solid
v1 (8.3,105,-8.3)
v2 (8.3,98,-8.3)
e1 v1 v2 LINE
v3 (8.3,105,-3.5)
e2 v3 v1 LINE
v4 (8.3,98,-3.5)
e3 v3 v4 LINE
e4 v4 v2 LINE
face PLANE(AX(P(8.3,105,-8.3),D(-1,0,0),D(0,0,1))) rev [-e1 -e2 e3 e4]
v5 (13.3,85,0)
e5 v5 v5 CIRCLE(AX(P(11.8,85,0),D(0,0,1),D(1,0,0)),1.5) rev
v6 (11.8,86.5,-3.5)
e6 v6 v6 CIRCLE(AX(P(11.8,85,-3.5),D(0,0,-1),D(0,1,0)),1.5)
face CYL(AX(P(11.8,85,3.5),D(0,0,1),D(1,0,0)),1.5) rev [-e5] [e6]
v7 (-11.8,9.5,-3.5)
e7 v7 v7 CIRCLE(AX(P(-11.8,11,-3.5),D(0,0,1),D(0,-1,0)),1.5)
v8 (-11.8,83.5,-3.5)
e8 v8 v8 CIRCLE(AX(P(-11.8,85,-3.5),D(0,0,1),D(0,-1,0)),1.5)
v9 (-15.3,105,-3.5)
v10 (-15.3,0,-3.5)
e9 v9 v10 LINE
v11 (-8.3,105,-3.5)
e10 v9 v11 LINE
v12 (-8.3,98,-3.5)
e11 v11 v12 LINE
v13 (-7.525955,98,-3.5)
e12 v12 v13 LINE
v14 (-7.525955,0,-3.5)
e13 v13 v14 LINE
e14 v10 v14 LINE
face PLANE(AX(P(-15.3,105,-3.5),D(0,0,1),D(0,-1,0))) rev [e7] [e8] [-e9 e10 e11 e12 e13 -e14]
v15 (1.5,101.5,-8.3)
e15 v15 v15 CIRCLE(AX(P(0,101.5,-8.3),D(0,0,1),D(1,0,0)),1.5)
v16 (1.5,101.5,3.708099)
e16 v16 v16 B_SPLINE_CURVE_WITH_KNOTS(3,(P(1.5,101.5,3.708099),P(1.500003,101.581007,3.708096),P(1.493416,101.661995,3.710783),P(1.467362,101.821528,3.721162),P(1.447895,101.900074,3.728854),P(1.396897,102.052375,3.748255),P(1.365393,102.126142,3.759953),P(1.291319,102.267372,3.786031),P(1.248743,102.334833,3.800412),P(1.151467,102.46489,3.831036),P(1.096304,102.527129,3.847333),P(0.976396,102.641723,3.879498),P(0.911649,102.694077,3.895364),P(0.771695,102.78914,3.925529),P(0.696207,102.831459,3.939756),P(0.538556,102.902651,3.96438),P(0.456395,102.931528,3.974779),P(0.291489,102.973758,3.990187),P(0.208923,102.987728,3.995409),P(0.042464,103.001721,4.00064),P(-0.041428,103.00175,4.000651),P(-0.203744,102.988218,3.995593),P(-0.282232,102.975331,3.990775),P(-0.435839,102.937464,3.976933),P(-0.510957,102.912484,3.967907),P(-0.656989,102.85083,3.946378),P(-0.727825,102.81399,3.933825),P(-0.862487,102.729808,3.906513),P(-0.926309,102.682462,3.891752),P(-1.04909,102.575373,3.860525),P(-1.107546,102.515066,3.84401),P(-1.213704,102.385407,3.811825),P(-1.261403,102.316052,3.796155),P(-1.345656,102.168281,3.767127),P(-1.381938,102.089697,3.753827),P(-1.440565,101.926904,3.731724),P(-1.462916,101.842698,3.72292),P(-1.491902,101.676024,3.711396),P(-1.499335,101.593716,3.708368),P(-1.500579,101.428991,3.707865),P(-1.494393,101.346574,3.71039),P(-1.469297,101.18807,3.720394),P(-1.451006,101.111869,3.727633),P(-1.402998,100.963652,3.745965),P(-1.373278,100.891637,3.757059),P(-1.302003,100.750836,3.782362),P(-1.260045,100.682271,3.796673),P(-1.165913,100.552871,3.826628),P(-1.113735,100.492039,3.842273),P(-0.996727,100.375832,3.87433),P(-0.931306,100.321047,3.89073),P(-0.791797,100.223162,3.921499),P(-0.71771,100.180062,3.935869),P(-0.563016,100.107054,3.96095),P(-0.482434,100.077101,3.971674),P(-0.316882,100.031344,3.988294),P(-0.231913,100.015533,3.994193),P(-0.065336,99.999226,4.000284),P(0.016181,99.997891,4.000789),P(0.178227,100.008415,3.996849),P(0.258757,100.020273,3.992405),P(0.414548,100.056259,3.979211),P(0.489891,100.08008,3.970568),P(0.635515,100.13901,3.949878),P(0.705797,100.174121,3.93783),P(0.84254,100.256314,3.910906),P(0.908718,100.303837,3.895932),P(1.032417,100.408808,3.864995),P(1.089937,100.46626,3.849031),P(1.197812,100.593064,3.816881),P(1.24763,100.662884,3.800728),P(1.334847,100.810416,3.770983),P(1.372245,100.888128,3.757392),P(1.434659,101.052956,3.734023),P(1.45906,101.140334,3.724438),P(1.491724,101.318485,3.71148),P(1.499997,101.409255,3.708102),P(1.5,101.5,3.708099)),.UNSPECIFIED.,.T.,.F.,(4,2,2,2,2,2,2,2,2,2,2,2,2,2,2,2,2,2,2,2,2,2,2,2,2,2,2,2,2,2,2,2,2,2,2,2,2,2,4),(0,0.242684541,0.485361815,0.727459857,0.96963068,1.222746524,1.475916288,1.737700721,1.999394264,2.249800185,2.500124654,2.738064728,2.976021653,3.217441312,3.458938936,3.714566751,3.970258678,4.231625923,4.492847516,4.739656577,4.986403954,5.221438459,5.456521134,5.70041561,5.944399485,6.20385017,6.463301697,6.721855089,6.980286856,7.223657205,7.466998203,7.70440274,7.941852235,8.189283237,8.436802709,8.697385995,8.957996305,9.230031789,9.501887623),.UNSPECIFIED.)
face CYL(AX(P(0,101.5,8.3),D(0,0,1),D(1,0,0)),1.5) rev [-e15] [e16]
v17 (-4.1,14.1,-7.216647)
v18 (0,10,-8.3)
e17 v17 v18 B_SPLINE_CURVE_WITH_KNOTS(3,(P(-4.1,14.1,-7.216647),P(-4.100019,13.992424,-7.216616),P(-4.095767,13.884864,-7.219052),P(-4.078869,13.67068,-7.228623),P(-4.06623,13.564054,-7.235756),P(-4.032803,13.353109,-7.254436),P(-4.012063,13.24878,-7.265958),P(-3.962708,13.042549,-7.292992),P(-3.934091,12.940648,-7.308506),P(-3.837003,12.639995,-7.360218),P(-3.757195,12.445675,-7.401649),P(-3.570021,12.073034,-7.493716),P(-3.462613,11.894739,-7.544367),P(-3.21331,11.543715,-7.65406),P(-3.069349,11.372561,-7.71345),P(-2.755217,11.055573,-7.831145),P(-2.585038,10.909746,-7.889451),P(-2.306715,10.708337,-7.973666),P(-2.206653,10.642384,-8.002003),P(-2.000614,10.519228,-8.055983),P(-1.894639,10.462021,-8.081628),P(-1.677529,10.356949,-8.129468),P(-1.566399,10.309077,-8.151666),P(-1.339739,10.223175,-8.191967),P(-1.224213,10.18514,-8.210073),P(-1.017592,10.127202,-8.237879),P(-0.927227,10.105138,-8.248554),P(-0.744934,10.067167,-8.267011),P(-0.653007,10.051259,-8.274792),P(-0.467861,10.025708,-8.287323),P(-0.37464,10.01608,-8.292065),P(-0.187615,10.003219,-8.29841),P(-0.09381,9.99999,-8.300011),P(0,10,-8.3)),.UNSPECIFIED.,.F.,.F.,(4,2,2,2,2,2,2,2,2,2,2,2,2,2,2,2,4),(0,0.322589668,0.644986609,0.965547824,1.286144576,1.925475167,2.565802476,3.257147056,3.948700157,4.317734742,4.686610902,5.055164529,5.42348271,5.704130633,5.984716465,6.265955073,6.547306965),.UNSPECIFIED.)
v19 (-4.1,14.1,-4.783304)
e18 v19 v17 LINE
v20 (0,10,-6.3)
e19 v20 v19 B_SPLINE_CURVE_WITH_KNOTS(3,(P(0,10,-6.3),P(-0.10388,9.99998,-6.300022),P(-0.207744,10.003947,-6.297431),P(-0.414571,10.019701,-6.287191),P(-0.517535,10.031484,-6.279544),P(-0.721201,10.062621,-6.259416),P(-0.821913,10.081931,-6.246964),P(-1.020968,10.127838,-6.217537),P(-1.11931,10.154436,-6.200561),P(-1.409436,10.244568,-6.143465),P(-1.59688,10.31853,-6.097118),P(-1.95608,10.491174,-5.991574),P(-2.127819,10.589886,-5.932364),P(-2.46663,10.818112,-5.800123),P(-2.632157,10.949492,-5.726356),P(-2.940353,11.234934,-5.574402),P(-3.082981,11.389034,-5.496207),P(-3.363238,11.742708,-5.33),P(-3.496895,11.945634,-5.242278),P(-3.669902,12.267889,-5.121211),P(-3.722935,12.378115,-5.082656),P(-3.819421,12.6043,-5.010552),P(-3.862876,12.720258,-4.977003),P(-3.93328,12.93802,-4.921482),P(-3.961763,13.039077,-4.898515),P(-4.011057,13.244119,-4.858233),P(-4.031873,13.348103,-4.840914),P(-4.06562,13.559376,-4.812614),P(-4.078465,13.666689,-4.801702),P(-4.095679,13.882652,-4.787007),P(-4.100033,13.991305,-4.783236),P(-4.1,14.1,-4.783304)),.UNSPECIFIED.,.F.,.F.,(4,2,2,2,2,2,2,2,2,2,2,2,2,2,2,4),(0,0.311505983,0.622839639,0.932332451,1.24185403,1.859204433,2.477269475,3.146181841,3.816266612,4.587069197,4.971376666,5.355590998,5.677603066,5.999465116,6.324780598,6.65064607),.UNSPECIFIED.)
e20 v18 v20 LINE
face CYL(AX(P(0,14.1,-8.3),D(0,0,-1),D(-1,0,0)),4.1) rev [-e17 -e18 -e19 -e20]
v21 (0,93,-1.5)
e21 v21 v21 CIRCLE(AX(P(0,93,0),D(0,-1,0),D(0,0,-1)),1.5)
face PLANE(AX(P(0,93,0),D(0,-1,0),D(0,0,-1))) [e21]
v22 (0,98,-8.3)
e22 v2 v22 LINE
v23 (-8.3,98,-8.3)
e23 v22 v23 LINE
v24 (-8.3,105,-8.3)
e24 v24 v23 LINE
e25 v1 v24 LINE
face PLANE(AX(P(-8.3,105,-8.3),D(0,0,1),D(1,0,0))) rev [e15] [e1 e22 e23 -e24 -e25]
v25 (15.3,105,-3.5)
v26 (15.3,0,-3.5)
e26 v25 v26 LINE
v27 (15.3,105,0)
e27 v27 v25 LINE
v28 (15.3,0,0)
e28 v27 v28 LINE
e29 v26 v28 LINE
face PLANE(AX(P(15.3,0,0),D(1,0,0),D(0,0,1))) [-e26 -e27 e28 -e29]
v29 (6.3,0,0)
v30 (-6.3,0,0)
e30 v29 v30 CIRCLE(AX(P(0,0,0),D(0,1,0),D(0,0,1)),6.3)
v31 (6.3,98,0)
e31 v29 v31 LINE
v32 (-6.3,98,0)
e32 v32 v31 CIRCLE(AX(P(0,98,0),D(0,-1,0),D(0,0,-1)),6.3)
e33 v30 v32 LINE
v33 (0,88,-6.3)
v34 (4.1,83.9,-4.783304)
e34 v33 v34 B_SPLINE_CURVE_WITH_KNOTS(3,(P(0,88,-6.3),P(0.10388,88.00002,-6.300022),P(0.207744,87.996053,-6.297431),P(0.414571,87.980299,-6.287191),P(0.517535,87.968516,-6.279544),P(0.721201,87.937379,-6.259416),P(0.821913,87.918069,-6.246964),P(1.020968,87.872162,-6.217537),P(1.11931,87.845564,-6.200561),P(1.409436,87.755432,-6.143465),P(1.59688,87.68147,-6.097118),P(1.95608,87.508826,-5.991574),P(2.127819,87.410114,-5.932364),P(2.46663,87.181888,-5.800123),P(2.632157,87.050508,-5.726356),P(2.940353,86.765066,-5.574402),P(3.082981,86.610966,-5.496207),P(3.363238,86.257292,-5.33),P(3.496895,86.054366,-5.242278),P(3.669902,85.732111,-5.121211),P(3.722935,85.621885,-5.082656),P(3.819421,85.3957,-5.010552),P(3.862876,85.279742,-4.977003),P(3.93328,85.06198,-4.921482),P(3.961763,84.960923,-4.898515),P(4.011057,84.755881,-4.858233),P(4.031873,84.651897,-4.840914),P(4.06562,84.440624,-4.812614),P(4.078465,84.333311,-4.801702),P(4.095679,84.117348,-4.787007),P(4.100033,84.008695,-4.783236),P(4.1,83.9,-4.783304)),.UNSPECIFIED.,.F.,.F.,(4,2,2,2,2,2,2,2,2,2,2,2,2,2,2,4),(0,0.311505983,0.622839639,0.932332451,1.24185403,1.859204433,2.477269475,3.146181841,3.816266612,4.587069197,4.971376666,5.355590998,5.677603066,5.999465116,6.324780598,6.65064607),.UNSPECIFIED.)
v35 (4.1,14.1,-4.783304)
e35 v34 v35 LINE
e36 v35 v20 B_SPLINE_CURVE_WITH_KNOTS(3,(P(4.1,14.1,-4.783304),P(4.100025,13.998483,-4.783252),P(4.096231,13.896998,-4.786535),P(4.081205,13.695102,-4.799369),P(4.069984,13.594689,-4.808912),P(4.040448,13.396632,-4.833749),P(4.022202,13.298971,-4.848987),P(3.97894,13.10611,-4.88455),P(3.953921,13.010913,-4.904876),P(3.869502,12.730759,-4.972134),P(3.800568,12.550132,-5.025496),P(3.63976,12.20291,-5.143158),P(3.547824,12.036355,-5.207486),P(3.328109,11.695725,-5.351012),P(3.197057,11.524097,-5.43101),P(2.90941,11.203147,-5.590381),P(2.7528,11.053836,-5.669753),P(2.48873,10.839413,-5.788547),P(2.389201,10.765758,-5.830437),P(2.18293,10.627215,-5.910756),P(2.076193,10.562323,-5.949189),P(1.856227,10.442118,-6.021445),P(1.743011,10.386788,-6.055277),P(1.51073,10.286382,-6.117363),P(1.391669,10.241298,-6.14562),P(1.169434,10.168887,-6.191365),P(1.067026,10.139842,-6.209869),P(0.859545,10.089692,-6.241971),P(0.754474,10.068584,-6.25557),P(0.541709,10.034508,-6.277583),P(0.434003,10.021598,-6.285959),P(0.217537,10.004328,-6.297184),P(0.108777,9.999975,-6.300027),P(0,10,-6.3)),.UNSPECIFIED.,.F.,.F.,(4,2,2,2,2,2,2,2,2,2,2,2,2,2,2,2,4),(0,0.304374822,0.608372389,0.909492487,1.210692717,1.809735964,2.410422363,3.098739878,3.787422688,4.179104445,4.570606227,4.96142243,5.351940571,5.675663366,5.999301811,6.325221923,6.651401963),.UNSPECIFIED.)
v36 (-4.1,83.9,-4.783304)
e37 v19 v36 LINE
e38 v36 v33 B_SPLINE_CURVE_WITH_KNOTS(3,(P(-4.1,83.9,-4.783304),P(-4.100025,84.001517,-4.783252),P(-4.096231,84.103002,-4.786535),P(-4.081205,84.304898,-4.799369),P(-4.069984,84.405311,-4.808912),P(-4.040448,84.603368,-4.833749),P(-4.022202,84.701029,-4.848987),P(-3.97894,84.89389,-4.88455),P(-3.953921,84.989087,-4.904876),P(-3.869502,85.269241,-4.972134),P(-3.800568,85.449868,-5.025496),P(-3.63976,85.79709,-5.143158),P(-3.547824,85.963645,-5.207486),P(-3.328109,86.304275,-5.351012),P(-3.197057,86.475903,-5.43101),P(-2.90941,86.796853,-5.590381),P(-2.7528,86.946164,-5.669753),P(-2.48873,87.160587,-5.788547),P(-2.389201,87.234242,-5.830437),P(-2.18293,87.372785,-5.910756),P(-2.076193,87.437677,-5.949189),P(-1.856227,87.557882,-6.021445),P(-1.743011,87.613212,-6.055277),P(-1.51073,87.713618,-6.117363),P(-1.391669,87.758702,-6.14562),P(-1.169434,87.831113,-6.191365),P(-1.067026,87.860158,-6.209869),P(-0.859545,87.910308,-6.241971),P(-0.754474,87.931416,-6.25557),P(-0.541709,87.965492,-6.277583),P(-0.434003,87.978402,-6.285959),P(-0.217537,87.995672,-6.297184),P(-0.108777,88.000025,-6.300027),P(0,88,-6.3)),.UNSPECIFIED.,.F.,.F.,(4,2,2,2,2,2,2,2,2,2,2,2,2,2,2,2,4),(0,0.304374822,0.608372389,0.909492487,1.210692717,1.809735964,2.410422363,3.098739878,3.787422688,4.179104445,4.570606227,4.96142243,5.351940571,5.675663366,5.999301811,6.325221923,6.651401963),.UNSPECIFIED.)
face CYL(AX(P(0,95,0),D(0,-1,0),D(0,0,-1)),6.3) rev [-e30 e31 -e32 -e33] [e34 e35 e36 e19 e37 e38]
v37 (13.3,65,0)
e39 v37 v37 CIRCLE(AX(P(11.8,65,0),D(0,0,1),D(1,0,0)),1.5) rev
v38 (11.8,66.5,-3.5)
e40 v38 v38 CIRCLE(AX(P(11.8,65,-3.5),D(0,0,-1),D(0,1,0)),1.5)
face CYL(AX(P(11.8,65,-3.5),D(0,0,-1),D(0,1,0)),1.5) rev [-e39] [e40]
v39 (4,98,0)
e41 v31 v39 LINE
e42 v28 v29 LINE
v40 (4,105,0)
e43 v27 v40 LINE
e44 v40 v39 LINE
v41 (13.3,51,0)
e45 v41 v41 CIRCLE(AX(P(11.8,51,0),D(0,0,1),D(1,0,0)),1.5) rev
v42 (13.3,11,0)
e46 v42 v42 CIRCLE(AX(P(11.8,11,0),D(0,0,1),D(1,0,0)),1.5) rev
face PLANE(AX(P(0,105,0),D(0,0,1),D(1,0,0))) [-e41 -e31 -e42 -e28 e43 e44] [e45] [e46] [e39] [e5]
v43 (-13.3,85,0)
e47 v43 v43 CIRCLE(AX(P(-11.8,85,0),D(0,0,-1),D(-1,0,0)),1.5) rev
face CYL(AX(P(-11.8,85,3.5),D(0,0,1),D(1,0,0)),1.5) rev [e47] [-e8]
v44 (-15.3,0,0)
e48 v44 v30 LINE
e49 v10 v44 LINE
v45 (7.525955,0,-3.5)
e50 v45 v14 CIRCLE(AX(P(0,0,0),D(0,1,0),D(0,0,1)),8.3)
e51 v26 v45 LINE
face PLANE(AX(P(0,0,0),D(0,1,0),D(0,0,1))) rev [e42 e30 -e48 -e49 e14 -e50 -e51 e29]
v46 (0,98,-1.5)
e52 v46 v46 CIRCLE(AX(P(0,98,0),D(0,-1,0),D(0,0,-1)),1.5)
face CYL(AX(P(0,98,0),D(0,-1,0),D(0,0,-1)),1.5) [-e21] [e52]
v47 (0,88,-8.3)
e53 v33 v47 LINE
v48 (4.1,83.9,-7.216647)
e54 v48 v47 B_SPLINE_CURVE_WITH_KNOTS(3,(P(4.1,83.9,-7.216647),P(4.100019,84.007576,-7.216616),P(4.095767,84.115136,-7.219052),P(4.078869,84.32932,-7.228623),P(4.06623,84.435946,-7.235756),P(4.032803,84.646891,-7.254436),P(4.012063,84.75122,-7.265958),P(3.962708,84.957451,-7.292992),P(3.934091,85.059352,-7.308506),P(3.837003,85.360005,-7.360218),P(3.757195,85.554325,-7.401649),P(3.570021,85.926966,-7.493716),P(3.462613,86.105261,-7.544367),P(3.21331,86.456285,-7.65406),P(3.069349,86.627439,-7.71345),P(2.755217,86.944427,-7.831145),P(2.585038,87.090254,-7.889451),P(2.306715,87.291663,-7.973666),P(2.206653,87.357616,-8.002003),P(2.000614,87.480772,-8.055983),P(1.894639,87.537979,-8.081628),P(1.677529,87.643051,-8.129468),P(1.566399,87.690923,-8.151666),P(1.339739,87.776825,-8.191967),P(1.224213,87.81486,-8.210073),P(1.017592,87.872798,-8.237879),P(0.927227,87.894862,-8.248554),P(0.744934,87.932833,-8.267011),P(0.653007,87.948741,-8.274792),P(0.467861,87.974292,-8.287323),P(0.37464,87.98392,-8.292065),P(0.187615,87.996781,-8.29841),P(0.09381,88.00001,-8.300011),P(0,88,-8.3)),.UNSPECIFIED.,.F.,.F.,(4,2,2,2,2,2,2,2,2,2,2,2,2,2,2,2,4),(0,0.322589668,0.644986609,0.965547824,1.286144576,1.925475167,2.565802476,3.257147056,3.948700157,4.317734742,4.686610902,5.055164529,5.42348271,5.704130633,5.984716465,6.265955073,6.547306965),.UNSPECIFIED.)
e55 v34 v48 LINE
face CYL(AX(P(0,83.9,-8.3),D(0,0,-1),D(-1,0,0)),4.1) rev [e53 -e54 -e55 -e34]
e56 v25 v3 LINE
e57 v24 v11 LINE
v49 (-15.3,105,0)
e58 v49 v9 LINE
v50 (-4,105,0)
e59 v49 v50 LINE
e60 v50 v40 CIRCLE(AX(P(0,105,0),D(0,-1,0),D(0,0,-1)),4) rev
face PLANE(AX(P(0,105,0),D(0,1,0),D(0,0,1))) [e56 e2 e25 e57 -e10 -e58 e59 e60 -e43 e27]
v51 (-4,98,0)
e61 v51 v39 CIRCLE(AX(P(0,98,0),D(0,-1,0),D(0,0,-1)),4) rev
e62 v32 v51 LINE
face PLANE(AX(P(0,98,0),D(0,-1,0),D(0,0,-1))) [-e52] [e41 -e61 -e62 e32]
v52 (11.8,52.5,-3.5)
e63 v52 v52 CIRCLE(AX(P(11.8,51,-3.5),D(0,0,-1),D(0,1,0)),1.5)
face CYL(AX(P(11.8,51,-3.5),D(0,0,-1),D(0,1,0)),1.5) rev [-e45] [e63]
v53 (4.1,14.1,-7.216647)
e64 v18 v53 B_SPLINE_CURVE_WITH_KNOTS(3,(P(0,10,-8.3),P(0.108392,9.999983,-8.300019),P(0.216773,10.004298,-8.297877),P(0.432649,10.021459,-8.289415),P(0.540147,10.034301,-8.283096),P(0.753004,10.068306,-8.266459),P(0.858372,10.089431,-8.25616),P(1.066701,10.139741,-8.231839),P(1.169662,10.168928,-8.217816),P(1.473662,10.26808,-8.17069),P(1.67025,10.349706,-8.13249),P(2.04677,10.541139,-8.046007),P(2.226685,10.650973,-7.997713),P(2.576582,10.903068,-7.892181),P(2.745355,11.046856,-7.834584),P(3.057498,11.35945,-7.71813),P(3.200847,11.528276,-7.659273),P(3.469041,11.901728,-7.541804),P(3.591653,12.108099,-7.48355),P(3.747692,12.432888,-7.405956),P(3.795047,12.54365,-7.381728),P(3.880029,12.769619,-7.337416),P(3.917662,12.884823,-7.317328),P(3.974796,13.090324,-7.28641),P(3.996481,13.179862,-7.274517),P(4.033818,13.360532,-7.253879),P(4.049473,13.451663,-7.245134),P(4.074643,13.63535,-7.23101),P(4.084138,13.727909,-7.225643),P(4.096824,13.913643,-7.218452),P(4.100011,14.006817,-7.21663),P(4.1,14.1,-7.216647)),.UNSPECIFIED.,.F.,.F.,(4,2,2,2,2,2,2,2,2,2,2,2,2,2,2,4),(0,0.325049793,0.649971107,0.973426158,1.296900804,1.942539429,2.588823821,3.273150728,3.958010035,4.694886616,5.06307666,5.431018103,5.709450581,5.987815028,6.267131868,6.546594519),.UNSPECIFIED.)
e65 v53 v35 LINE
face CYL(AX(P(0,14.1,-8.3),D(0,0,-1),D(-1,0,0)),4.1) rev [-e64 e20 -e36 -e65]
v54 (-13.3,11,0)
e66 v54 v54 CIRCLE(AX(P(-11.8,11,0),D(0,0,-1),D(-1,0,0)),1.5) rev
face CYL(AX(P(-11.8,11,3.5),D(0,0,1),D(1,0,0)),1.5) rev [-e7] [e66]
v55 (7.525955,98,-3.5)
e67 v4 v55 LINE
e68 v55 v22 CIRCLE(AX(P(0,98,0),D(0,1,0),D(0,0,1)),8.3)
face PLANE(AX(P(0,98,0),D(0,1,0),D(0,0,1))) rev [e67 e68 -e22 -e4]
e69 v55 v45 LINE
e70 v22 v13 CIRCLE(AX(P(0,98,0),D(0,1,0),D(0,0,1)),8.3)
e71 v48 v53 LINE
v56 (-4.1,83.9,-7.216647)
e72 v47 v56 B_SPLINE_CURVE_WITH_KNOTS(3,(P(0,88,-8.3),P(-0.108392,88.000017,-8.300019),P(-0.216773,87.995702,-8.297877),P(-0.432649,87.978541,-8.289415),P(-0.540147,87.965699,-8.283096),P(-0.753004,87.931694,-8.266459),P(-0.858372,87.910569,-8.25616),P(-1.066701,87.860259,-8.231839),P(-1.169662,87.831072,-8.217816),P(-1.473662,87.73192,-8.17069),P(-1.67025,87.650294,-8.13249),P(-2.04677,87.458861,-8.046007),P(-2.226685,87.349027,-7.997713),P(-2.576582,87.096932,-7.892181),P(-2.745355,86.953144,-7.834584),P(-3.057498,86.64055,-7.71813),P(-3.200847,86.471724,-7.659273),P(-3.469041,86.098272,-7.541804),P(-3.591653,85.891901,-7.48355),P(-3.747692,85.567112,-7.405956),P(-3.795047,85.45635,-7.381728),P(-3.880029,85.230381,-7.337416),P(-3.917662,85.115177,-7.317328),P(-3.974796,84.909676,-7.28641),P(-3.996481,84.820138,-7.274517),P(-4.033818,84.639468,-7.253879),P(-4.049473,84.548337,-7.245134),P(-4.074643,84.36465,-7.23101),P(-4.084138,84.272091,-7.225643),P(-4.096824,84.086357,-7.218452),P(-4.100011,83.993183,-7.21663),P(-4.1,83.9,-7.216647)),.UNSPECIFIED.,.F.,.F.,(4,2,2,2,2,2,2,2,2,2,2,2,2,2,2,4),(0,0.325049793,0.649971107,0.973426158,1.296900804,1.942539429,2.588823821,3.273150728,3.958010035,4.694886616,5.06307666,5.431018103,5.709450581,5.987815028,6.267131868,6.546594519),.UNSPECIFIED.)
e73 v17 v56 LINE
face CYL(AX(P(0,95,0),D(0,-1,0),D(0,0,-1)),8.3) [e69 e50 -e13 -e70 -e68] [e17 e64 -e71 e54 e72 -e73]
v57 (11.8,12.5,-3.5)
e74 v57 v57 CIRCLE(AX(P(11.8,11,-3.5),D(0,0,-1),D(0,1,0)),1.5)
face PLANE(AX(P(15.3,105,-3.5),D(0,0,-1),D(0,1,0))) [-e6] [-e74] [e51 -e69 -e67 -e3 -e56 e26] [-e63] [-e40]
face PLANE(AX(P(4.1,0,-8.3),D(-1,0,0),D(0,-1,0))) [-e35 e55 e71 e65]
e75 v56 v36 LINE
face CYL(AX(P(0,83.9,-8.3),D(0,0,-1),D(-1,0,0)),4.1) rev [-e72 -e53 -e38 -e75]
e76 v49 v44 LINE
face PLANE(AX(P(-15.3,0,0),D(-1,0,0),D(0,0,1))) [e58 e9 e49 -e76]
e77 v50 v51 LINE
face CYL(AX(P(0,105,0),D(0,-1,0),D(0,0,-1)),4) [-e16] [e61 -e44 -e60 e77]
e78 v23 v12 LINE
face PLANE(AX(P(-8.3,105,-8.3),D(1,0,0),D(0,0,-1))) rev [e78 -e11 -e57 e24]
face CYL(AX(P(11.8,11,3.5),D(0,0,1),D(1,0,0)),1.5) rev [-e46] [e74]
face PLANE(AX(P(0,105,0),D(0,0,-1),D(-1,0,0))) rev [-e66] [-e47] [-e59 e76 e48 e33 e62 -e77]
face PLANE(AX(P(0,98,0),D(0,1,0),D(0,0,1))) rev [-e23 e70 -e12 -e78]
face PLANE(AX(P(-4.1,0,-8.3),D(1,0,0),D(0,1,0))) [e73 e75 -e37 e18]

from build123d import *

# Parameters (mm, degrees)
SKETCH1_R                = 8.3
SKETCH1_R_2              = 6.3
BOSS_EXTRUDE1_DEPTH      = 95
SKETCH3_R                = 8.3
BOSS_EXTRUDE2_DEPTH      = 3
SKETCH5_W                = 16.6
SKETCH5_H                = 16.6
BOSS_EXTRUDE4_DEPTH      = 7
CUT_EXTRUDE1_DEPTH       = 107.627623063
FILLET1_R                = 4.1
SKETCH4_R                = 6.3
SKETCH4_R_2              = 1.5
CUT_EXTRUDE3_DEPTH       = 3
BOSS_EXTRUDE6_START      = 2
SKETCH8_R                = 1.5
BOSS_EXTRUDE6_DEPTH      = 2
BOSS_EXTRUDE7_START      = -0.774045
BOSS_EXTRUDE7_DEPTH      = 7.774045
F_3_0_3_DIAMETER_HOLE1_D = 3
F_3_0_3_DIAMETER_HOLE2_D = 3
F_3_0_3_DIAMETER_HOLE3_D = 3
CUT_EXTRUDE4_DEPTH       = 107.432983617


with BuildPart() as part:
    # Sketch1 → Boss-Extrude1 (new body)
    with BuildSketch(Plane(origin=(0, 0, 0), x_dir=(1, 0, 0), z_dir=(0, 1, 0))):
        with Locations(Location((0, 0, 0), (0, 0, 270))):
            Circle(SKETCH1_R)
        with Locations(Location((0, 0, 0), (0, 0, 270))):
            Circle(SKETCH1_R_2, mode=Mode.SUBTRACT)
    extrude(amount=BOSS_EXTRUDE1_DEPTH)

    # Sketch3 → Boss-Extrude2 (add)
    with BuildSketch(Plane(origin=(0, 95, 0), x_dir=(1, 0, 0), z_dir=(0, 1, 0))):
        with Locations(Location((0, 0, 0), (0, 0, 270))):
            Circle(SKETCH3_R)
    extrude(amount=BOSS_EXTRUDE2_DEPTH)

    # Sketch5 → Boss-Extrude4 (add)
    with BuildSketch(Plane(origin=(0, 98, 0), x_dir=(1, 0, 0), z_dir=(0, 1, 0))):
        Rectangle(SKETCH5_W, SKETCH5_H)
    extrude(amount=BOSS_EXTRUDE4_DEPTH)

    # Sketch6 → Cut-Extrude1 (cut, through all)
    with BuildSketch(Plane.XY.offset(8.3)):
        Polygon((4.1, 10), (0, 10), (-4.1, 10), (-4.1, 88), (4.1, 88), align=None)
    extrude(amount=-CUT_EXTRUDE1_DEPTH, mode=Mode.SUBTRACT)

    # Fillet1
    fillet1_edges = [part.edges().sort_by_distance(p)[0] for p in [
        (4.1, 88, 5.999975859),
        (4.1, 88, -5.999975859),
        (-4.1, 88, 5.999975859),
        (-4.1, 88, -5.999975859),
        (4.1, 10, -5.999975859),
        (4.1, 10, 5.999975859),
        (-4.1, 10, -5.999975859),
        (-4.1, 10, 5.999975859),
    ]]
    fillet(fillet1_edges, radius=FILLET1_R - 0.0001)  # a hair under: the kernel refuses the full size

    # Sketch4 → Cut-Extrude3 (cut)
    with BuildSketch(Plane(origin=(0, 95, 0), x_dir=(-1, 0, 0), z_dir=(0, -1, 0))):
        with Locations(Location((0, 0, 0), (0, 0, 90))):
            Circle(SKETCH4_R)
        with Locations(Location((0, 0, 0), (0, 0, 90))):
            Circle(SKETCH4_R_2, mode=Mode.SUBTRACT)
    extrude(amount=-CUT_EXTRUDE3_DEPTH, mode=Mode.SUBTRACT)

    # Sketch8 → Boss-Extrude6 (add)
    with BuildSketch(Plane(origin=(0, 95, 0), x_dir=(-1, 0, 0), z_dir=(0, -1, 0)).offset(BOSS_EXTRUDE6_START)):
        with Locations(Location((0, 0, 0), (0, 0, 90))):
            Circle(SKETCH8_R)
    extrude(amount=-BOSS_EXTRUDE6_DEPTH)

    # Sketch9 → Boss-Extrude7 (add)
    with BuildSketch(Plane.ZY.offset(8.3).offset(BOSS_EXTRUDE7_START)):
        Polygon((0, 0), (3.5, 0), (3.5, 105), (-3.5, 105), (-3.5, 0), align=None)
    boss_extrude7 = extrude(amount=BOSS_EXTRUDE7_DEPTH)

    # Mirror1: Boss-Extrude7 across plane
    add(boss_extrude7.mirror(Plane(origin=(0, 0, 0), x_dir=(0, 0, 1), z_dir=(1, 0, 0))))

    # Ø3.0 (3) Diameter Hole1 (through all)
    with Locations(Plane.XY.offset(8.3)):
        with Locations((0, 101.5)):
            Hole(F_3_0_3_DIAMETER_HOLE1_D / 2)

    # Ø3.0 (3) Diameter Hole2 (through all)
    with Locations(Plane.XY.offset(3.5)):
        with Locations((11.8, 85), (11.8, 11)):
            f_3_0_3_diameter_hole2 = Hole(F_3_0_3_DIAMETER_HOLE2_D / 2)

    # Ø3.0 (3) Diameter Hole3 (through all)
    with Locations(Plane(origin=(0, 0, -3.5), x_dir=(-1, 0, 0), z_dir=(0, 0, -1))):
        with Locations((-11.8, 65), (-11.8, 51)):
            Hole(F_3_0_3_DIAMETER_HOLE3_D / 2)

    # Mirror2: Ø3.0 (3) Diameter Hole2 across plane
    add(f_3_0_3_diameter_hole2.mirror(Plane(origin=(0, 0, 0), x_dir=(0, 0, 1), z_dir=(1, 0, 0))), mode=Mode.SUBTRACT)

    # Sketch17 → Cut-Extrude4 (cut, through all)
    with BuildSketch(Plane(origin=(0, 0, 0), x_dir=(-1, 0, 0), z_dir=(0, -1, 0))):
        with BuildLine():
            Line((15.3, -73.411355502), (15.3, 0))
            Line((15.3, 0), (15.3, 8.3))
            Line((15.3, 8.3), (-15.3, 8.3))
            Line((-15.3, 8.3), (-15.3, -8.3))
            Line((-15.3, -8.3), (15.3, -8.3))
            Line((15.3, -8.3), (15.3, 0))
            Line((15.3, 0), (4, 0))
            ThreePointArc((4, 0), (0, -4), (-4, 0))
            Line((-4, 0), (-15.3, 0))
            Line((-15.3, 0), (-88.711355502, 0))
            Line((-88.711355502, 0), (-173.375060896, -119.954013921))
            Line((-173.375060896, -119.954013921), (-69.363705394, -193.365369423))
            Line((-69.363705394, -193.365369423), (15.3, -73.411355502))
        make_face()
    extrude(amount=-CUT_EXTRUDE4_DEPTH, mode=Mode.SUBTRACT)


with BuildPart() as cut_extrude4_kept_piece:
    # of the separate pieces the step leaves, the one the design keeps (cut_extrude4_pieces_kept)
    add(part.part.solids().sort_by_distance((15.3, 0, -3.5))[0])


solid = cut_extrude4_kept_piece.part
